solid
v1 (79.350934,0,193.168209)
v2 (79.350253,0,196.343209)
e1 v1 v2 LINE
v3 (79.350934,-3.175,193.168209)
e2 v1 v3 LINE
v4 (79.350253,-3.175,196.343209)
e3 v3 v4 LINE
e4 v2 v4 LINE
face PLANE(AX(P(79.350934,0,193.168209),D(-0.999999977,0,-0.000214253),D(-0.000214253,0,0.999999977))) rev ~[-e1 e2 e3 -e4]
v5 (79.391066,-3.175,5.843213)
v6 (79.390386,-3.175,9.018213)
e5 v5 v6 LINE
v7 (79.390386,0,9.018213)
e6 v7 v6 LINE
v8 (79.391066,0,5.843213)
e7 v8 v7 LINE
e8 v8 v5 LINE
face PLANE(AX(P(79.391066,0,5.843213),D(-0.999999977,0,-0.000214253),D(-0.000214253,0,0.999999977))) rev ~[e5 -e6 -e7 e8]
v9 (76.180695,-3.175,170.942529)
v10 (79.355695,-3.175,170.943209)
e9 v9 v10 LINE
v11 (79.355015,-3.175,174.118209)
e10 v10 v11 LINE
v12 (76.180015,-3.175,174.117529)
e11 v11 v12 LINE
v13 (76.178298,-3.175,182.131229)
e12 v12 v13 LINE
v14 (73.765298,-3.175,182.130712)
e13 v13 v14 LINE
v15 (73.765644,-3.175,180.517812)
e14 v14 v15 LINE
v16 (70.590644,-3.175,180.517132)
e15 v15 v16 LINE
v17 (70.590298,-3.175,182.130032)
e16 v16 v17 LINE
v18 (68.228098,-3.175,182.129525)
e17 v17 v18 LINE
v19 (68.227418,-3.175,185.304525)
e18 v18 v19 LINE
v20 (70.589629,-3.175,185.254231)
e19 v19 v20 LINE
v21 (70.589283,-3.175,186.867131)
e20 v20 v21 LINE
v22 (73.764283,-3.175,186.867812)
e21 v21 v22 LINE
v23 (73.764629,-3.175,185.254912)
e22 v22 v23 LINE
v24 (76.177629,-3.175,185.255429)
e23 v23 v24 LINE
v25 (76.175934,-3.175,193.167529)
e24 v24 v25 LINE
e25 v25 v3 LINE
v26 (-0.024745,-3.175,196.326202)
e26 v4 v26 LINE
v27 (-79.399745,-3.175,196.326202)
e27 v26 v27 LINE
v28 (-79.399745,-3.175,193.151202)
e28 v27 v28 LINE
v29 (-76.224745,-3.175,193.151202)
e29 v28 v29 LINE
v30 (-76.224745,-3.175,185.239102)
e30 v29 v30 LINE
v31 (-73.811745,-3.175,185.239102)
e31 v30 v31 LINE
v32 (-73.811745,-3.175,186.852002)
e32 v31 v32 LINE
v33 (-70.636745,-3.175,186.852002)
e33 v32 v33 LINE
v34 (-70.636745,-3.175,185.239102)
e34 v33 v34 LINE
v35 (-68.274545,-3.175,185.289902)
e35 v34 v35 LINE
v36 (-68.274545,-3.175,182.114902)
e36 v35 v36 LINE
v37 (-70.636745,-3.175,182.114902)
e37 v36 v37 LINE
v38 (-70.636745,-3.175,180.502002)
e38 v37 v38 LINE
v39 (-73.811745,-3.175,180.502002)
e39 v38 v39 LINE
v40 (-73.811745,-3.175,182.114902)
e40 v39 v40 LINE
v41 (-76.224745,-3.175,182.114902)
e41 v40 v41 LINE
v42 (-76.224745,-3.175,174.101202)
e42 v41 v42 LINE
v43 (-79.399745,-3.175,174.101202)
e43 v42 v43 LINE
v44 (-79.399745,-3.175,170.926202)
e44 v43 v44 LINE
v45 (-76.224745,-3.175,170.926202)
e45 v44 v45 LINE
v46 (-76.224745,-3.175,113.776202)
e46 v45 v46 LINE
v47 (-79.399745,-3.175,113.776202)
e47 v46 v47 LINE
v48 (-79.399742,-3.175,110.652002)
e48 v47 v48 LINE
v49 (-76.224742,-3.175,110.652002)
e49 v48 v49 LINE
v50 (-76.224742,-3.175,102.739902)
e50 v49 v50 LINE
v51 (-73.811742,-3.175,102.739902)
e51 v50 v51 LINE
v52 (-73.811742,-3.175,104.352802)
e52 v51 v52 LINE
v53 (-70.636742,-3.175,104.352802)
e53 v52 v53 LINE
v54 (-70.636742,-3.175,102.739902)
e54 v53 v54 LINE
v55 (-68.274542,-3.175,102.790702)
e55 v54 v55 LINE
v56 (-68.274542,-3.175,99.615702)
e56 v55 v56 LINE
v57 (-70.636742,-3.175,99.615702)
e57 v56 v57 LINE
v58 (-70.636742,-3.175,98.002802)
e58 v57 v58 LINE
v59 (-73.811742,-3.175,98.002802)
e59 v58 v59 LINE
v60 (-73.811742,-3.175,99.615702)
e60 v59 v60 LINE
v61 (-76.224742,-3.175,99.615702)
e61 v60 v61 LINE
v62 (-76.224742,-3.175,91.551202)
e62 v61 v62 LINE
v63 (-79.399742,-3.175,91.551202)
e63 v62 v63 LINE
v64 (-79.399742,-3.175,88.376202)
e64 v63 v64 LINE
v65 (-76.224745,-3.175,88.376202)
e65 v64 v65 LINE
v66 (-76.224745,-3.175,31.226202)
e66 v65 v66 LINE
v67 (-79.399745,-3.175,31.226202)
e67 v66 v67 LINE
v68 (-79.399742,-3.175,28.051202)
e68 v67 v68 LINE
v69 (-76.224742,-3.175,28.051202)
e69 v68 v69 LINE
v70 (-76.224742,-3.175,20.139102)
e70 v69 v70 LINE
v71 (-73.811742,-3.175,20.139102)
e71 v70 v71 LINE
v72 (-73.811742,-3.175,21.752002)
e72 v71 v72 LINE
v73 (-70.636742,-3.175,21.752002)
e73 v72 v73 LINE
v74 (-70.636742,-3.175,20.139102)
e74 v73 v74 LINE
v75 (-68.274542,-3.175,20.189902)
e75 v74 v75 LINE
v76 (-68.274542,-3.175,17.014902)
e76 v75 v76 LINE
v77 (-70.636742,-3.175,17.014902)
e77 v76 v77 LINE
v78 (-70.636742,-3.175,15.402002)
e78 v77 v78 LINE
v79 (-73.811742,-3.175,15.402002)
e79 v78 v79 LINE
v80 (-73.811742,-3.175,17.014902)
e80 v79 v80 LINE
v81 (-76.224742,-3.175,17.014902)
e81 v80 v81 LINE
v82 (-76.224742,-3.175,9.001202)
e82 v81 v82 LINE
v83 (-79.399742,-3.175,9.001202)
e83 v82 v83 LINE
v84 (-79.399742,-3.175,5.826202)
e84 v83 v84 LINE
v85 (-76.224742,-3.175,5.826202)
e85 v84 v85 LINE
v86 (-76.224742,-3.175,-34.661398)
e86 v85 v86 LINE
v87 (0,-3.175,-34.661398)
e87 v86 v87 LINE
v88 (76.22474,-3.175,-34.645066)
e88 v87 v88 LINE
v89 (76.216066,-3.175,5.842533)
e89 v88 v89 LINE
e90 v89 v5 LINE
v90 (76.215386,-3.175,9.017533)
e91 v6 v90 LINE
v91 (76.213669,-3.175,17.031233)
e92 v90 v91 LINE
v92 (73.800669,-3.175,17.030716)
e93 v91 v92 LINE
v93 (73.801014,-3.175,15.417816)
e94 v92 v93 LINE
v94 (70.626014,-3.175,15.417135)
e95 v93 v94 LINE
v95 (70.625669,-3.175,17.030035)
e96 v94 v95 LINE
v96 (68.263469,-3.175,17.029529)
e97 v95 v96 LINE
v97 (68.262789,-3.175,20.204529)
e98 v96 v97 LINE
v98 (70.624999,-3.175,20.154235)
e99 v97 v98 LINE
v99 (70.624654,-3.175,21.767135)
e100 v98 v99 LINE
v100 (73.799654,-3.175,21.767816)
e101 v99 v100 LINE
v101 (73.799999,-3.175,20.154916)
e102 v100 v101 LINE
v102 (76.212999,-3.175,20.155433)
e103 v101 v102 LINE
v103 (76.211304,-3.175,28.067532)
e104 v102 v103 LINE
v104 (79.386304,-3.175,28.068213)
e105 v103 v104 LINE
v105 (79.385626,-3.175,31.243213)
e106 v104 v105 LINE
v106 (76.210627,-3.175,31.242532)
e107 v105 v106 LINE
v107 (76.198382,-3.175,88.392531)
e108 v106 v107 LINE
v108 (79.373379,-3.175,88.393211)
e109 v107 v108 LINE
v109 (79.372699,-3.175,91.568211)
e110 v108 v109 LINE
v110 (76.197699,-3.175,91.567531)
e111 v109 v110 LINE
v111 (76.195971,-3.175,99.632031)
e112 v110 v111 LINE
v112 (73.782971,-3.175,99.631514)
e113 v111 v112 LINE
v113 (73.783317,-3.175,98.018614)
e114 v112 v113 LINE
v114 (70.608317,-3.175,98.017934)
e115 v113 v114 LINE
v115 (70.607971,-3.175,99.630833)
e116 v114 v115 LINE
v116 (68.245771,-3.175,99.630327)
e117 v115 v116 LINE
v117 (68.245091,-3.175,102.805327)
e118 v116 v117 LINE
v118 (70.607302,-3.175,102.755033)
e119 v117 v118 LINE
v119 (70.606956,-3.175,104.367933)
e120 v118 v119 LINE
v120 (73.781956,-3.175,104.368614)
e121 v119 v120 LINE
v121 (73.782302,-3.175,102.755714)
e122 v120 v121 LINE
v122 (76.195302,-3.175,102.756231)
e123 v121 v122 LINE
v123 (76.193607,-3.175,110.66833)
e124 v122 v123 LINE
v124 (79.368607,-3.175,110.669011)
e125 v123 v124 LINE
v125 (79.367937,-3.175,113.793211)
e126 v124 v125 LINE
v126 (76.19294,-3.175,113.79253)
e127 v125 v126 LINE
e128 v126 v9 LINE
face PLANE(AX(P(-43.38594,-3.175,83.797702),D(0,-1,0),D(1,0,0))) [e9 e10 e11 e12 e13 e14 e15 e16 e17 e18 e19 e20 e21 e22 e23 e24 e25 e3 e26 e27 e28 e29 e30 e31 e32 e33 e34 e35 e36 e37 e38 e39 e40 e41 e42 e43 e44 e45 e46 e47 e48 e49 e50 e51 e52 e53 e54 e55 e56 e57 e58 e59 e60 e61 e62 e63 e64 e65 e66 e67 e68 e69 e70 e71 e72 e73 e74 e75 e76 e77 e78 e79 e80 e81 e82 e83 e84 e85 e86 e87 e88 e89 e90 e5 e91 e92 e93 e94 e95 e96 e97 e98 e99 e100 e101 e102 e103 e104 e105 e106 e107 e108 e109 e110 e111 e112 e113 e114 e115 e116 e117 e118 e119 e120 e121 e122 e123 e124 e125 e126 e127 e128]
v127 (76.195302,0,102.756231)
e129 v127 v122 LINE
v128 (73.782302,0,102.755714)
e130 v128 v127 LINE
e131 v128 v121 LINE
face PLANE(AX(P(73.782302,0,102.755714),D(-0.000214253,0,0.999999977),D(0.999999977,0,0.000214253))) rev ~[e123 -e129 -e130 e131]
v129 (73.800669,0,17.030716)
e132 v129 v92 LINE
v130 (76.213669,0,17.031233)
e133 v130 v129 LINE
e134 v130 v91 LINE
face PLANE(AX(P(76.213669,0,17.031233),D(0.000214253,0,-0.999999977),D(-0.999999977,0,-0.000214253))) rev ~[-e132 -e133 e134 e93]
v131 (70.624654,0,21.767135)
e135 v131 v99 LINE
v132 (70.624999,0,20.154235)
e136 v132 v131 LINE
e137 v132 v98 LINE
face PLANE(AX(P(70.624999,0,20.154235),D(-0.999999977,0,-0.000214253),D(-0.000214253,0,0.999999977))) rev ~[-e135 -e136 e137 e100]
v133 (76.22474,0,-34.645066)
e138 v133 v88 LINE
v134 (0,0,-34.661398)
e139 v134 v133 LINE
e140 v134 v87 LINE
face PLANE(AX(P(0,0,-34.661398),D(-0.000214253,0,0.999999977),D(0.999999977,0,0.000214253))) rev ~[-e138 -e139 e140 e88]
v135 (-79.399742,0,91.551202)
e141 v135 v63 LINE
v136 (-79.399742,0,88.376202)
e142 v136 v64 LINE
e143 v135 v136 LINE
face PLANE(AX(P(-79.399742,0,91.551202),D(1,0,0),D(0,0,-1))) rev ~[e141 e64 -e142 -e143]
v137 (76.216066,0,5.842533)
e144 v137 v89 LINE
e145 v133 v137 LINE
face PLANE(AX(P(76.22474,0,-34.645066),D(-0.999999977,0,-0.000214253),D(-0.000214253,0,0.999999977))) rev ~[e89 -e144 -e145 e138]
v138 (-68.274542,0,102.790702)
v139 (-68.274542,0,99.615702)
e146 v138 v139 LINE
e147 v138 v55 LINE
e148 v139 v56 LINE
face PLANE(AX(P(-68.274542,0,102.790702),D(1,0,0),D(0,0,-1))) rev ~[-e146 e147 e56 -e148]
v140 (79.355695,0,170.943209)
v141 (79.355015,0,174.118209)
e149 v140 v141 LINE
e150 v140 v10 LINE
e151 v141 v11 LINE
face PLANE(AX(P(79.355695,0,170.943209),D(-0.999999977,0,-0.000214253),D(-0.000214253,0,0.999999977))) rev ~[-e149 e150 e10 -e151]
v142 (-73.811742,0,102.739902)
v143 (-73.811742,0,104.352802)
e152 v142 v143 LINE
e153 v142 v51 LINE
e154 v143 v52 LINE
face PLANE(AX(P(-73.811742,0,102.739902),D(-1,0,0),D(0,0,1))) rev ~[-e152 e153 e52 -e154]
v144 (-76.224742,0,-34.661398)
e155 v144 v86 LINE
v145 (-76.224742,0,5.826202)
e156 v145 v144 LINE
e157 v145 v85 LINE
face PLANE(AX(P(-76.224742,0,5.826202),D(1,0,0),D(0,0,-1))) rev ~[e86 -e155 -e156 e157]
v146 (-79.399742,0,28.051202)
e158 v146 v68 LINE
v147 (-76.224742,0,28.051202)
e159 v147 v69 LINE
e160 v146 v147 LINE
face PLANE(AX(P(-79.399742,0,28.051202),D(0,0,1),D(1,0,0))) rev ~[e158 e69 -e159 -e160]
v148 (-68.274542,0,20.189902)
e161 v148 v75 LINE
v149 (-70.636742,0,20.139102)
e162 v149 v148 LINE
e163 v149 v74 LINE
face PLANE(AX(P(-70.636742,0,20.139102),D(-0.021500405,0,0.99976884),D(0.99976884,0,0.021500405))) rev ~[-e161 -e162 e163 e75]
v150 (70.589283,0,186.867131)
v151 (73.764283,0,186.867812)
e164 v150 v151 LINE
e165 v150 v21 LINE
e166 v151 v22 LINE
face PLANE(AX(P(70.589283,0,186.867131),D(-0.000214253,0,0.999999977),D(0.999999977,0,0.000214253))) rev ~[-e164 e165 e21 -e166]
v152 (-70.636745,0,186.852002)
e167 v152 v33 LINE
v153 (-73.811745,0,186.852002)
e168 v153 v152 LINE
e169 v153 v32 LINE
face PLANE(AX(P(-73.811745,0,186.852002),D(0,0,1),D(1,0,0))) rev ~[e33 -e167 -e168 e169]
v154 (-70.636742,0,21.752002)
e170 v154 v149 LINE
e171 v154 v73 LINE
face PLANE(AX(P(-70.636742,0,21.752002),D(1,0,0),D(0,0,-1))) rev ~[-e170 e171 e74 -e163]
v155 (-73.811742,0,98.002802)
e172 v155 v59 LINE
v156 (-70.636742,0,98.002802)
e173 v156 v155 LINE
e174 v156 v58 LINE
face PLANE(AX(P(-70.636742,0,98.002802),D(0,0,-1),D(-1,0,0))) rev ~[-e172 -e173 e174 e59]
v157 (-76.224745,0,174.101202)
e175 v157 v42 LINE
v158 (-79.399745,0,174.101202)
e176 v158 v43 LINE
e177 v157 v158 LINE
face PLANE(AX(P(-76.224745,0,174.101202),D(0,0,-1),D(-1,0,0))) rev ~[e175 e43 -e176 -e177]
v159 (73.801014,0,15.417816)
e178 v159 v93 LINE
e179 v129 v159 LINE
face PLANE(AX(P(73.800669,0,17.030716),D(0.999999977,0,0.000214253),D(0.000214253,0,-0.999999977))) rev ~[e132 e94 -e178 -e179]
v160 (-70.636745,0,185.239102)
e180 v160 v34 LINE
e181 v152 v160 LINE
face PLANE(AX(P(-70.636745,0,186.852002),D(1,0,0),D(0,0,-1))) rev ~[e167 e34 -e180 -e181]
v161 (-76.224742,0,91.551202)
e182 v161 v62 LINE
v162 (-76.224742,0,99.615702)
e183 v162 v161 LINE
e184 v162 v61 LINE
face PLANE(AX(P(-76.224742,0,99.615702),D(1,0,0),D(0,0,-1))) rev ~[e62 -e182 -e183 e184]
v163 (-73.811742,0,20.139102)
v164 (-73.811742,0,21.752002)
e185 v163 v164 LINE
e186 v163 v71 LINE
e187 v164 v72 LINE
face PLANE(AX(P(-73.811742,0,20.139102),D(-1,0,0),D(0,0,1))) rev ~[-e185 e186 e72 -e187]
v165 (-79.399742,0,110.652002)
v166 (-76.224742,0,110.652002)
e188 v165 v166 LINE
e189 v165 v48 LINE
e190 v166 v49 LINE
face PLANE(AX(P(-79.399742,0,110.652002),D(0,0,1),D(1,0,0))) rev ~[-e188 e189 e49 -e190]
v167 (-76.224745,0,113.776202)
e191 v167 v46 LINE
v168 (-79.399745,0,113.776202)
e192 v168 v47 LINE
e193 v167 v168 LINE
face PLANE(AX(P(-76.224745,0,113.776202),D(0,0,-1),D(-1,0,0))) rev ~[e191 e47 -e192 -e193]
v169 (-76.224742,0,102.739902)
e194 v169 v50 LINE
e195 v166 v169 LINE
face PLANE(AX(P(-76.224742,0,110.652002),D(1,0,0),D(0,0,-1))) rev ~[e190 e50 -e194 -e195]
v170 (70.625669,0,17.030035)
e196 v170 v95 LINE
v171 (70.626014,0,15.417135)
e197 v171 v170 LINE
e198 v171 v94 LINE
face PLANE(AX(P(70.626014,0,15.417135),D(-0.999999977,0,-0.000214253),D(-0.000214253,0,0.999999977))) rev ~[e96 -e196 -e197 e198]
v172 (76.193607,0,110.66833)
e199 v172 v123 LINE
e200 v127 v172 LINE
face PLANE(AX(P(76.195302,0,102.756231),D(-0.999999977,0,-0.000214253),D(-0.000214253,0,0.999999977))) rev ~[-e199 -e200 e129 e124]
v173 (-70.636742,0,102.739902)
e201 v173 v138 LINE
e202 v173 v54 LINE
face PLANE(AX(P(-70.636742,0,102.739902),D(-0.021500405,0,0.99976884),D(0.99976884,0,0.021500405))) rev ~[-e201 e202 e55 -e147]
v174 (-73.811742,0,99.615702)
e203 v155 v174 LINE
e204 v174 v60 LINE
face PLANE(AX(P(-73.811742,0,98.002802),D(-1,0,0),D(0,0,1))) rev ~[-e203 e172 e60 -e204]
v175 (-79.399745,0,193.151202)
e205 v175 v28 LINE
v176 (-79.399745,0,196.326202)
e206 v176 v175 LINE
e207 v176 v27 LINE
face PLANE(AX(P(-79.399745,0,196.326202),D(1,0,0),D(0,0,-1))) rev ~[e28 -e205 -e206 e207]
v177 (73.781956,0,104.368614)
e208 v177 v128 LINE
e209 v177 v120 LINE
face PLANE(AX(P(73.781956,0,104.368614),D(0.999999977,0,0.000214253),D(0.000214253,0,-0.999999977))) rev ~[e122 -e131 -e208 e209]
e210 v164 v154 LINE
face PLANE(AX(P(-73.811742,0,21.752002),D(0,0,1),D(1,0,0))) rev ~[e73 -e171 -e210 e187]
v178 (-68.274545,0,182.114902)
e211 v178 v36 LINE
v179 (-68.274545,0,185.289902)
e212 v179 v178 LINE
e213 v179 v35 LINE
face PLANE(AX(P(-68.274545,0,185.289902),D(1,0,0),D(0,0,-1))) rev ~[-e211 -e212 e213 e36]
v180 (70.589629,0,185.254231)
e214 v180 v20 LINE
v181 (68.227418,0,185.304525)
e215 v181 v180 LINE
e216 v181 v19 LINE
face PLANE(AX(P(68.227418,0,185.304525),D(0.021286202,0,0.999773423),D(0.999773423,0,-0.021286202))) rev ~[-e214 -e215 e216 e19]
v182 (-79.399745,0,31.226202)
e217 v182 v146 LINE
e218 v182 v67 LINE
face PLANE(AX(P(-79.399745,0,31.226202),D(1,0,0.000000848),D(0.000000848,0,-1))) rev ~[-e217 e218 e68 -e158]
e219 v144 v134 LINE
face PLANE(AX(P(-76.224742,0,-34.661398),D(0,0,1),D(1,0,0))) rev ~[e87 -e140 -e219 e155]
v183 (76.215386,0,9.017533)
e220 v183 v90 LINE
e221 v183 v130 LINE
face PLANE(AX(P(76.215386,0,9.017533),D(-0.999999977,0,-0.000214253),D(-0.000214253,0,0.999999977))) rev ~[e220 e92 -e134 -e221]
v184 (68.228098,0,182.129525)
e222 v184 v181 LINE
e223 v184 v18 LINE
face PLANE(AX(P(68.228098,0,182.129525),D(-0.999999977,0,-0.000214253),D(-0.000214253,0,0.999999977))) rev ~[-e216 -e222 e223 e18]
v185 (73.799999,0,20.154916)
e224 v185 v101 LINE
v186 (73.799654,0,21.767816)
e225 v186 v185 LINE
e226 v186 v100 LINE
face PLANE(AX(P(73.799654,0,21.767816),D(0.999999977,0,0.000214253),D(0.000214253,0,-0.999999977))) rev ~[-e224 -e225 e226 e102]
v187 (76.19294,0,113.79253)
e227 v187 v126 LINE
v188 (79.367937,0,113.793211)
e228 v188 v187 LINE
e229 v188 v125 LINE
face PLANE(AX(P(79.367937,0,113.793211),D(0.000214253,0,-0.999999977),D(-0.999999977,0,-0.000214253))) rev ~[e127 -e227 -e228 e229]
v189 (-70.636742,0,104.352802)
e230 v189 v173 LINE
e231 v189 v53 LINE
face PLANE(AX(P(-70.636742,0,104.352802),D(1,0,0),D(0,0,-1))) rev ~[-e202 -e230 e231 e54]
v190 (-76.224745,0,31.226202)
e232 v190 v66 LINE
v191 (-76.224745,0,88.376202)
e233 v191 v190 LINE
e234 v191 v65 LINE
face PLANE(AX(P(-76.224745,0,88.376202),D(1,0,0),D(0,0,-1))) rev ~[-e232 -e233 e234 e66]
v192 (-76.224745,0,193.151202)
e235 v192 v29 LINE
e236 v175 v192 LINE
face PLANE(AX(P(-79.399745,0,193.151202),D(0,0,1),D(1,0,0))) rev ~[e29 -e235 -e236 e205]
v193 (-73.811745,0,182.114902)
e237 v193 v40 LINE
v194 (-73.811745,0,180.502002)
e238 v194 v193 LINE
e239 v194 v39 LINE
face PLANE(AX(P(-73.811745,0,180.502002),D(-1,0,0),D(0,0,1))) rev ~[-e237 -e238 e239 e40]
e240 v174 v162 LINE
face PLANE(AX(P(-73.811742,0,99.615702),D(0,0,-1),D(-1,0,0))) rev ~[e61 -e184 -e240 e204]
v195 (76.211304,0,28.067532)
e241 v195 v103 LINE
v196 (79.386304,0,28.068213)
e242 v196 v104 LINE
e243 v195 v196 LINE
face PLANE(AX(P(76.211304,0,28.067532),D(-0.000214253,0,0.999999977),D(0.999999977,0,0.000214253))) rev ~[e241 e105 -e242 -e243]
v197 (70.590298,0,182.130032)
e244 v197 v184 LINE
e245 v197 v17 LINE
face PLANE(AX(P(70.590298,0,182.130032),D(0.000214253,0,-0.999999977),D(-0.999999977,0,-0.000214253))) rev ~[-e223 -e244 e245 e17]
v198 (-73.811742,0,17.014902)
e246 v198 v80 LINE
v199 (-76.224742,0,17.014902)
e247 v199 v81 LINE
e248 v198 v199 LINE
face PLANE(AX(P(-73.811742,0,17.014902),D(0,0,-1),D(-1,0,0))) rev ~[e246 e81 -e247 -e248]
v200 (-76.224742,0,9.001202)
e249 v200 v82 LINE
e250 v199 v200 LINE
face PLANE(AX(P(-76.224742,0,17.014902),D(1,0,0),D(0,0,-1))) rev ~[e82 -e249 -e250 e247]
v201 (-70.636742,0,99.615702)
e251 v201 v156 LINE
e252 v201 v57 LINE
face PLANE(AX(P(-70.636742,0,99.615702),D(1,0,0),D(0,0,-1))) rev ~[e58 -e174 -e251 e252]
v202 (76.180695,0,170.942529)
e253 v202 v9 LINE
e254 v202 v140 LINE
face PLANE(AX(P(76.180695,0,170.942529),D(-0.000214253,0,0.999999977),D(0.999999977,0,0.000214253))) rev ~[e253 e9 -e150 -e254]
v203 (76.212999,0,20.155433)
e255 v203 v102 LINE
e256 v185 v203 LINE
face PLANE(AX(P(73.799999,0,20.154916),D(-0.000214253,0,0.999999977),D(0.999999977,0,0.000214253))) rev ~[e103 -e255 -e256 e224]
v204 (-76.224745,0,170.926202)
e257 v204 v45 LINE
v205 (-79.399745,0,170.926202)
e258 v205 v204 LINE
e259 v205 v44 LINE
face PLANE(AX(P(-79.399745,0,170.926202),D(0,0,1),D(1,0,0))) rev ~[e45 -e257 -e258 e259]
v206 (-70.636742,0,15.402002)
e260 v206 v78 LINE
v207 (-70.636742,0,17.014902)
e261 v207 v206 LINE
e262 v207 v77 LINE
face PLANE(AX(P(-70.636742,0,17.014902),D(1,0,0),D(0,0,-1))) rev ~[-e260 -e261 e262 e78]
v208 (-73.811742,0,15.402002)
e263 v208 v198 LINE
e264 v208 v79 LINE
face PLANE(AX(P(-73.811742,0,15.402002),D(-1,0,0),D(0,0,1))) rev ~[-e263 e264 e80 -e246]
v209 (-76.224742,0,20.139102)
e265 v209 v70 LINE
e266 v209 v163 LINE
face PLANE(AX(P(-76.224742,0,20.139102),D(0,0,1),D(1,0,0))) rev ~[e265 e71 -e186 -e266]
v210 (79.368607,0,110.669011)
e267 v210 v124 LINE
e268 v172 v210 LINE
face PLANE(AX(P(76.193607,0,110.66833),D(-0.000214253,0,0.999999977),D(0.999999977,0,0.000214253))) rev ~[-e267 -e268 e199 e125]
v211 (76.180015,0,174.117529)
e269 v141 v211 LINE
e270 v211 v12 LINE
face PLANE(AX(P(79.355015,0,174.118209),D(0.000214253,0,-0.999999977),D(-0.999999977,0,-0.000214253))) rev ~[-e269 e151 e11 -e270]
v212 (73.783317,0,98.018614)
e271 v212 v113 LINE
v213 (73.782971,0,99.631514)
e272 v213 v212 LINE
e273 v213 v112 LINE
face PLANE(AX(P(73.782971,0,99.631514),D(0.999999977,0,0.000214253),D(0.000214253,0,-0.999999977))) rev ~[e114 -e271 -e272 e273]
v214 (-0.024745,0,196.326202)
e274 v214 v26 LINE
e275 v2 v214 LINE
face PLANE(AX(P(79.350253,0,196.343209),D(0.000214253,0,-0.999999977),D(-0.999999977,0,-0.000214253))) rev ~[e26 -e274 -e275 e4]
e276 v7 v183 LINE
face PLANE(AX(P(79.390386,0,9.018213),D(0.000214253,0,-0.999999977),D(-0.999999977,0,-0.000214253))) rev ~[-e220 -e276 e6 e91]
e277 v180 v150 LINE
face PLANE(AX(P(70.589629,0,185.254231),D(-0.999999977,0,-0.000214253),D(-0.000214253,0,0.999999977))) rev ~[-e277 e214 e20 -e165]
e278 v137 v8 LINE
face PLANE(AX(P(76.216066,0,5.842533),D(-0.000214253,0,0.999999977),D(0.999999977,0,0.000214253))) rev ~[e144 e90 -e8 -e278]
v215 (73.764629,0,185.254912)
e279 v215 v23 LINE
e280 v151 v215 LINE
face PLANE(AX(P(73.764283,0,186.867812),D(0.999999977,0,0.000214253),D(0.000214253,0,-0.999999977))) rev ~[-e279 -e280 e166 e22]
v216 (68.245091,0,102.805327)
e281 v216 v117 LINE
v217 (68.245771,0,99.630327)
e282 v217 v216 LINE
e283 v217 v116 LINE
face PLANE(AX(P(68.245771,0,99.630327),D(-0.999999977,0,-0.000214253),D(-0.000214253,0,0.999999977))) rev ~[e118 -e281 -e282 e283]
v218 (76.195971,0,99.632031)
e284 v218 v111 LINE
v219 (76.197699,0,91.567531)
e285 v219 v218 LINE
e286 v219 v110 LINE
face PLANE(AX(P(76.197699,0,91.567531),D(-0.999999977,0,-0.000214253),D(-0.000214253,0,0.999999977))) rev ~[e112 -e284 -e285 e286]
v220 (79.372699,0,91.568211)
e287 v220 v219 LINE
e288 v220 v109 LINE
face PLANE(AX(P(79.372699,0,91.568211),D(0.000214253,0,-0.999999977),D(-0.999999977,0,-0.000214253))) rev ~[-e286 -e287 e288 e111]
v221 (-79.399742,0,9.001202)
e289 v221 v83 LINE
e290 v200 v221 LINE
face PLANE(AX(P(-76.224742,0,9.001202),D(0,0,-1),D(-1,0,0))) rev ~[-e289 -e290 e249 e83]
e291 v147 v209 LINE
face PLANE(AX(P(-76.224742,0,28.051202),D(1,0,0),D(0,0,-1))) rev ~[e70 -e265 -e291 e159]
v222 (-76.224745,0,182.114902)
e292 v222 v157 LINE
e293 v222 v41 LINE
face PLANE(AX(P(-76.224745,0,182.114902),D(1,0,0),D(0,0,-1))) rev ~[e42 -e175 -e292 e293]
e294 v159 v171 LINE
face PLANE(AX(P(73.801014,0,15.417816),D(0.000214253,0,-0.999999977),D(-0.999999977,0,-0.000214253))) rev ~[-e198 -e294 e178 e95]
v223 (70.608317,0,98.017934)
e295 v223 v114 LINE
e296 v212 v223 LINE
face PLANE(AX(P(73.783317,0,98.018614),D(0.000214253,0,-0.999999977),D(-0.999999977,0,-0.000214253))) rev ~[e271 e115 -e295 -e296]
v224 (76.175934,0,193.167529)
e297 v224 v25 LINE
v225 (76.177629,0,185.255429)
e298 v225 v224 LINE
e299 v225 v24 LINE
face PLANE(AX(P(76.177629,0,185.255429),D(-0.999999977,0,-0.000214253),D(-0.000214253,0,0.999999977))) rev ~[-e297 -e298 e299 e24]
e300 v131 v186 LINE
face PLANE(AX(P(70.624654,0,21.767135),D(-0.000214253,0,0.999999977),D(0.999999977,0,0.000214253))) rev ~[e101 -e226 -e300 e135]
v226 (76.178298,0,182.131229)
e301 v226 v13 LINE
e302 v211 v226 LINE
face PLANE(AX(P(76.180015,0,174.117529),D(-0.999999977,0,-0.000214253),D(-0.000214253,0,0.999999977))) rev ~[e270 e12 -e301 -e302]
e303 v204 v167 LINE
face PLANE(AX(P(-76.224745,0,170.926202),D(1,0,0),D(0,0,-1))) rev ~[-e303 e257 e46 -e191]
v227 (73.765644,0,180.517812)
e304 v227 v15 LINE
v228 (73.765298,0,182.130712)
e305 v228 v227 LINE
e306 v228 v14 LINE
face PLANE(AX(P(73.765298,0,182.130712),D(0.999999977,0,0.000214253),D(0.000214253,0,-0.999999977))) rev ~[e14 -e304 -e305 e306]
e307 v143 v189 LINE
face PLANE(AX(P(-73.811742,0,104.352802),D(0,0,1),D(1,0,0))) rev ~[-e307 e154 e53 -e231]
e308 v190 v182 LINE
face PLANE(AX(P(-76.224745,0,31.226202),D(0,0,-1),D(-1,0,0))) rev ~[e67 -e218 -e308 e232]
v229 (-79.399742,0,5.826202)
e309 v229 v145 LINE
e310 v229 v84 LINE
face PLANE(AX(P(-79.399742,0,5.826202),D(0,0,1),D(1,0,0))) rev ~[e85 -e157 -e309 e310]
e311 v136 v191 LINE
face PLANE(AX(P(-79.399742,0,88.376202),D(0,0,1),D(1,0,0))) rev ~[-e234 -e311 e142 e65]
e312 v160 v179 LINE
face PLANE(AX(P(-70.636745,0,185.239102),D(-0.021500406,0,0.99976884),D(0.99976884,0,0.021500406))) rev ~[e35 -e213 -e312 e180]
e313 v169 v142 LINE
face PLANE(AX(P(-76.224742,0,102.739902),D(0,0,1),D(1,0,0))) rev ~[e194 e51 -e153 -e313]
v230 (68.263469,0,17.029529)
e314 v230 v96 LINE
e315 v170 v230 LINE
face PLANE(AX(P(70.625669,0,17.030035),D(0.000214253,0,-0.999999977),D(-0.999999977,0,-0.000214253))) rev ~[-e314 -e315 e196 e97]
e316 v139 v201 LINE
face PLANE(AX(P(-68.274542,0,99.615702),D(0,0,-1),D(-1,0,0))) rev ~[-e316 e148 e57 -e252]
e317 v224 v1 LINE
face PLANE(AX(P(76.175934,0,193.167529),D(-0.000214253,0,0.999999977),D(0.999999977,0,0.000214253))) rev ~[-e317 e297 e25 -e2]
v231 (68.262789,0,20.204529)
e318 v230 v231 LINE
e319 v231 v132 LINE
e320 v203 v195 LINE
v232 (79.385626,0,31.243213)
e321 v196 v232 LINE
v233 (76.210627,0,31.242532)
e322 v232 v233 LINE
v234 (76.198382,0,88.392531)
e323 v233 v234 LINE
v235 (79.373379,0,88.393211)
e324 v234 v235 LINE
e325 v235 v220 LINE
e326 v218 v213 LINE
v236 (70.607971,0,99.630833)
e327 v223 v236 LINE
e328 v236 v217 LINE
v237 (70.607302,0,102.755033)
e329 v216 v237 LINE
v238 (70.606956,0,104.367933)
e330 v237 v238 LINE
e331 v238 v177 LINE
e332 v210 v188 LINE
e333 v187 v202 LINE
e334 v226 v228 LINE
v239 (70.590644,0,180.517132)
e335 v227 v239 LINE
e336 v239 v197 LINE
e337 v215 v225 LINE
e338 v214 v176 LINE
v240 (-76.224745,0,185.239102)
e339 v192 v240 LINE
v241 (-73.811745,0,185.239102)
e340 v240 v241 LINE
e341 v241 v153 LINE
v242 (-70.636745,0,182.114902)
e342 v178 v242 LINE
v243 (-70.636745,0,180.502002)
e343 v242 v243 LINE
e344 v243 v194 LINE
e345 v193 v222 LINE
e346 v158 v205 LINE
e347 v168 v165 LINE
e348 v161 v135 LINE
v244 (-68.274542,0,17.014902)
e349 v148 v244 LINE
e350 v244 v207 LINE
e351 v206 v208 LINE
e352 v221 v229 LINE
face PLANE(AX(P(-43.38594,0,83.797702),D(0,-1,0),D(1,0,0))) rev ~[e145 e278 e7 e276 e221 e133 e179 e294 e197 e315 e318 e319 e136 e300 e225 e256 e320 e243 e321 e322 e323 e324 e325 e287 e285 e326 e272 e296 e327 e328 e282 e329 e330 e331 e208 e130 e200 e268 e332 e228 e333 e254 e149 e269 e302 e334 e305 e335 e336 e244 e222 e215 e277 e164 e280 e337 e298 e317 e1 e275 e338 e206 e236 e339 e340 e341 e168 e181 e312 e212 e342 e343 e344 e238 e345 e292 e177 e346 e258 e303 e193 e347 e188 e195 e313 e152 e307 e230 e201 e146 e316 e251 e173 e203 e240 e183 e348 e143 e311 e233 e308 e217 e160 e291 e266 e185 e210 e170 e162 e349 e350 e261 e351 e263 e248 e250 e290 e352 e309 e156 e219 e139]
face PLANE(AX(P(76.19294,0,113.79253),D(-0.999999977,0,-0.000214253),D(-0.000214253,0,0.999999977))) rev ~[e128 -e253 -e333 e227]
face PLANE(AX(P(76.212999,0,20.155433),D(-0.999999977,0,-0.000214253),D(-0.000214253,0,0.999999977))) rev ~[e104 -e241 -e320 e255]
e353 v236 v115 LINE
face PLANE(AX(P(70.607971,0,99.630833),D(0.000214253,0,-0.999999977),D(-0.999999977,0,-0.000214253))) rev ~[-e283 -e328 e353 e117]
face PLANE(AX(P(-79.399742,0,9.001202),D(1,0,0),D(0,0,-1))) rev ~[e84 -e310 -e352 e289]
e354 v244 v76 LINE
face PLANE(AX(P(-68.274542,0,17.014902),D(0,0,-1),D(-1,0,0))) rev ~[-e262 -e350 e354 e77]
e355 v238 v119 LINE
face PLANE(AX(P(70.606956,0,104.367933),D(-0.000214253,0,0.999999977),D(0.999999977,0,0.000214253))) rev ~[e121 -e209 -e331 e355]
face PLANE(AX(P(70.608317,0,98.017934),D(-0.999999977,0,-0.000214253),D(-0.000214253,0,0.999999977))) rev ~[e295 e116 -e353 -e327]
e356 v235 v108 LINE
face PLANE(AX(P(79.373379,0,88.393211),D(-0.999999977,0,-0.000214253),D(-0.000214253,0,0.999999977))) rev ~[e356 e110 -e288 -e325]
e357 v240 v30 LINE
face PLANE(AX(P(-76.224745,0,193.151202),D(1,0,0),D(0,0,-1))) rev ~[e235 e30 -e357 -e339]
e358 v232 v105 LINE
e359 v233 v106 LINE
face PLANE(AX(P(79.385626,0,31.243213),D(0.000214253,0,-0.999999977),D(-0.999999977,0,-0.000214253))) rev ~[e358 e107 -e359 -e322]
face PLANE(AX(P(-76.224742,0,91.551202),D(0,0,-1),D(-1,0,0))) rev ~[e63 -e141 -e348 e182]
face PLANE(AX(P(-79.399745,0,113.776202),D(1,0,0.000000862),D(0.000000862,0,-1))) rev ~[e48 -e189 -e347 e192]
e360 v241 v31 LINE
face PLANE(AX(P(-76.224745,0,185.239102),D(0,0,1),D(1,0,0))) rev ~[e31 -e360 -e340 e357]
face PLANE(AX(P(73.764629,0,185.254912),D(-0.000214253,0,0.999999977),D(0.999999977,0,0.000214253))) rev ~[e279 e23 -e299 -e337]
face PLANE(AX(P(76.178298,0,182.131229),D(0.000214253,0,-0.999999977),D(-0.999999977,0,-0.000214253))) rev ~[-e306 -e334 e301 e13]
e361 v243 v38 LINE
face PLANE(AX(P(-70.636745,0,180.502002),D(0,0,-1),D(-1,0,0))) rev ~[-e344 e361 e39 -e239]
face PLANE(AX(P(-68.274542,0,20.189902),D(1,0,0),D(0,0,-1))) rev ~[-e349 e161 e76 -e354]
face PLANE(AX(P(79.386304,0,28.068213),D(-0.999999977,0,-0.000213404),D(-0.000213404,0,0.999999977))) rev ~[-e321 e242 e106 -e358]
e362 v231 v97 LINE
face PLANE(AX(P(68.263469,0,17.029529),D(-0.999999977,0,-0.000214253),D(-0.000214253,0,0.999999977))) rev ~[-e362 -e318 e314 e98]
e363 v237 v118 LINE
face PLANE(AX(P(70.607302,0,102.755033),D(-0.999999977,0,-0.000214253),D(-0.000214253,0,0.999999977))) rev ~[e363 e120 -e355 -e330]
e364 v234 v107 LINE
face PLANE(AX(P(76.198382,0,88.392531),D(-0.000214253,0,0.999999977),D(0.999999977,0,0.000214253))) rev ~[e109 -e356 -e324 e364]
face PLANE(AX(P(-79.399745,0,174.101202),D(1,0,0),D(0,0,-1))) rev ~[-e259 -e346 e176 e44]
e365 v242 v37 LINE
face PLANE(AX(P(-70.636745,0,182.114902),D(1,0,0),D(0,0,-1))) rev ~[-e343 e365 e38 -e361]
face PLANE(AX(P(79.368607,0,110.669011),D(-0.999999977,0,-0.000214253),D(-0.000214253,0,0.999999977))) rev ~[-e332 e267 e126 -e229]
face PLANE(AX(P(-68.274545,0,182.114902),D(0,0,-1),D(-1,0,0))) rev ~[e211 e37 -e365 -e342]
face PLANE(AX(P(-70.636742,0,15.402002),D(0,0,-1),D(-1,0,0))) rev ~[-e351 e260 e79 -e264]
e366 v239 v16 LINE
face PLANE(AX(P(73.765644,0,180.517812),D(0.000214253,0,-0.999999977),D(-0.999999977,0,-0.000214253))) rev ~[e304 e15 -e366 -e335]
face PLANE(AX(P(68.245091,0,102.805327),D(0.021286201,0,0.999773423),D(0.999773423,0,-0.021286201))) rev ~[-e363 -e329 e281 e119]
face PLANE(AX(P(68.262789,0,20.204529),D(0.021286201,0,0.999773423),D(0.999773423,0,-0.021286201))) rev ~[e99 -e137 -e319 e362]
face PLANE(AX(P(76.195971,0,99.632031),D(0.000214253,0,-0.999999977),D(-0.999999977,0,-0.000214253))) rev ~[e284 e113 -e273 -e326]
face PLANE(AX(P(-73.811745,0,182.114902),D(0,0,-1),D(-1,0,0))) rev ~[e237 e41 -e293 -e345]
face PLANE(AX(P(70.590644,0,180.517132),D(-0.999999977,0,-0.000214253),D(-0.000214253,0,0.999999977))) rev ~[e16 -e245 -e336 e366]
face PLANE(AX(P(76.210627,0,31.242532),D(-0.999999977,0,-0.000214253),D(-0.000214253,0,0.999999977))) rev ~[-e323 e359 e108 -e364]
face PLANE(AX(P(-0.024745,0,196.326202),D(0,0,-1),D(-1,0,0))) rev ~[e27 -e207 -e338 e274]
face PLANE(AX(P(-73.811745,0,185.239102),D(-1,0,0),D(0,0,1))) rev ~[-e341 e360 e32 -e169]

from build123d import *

# Parameters (mm, degrees)
F1_DEPTH = 3.175


# Not quite as in the source:
# - ends of sketch curves that miss each other by under 0.0002 mm in the source are joined


with BuildPart() as f1:
    # F0 (on Front) → F1 (new body)
    with BuildSketch(Plane.XZ):
        Polygon((-0.0247448797, 196.3262024198), (-79.3997448797, 196.3262024198), (-79.3997448797, 193.1512024198), (-76.2247448797, 193.1512024198), (-76.2247448797, 185.2391024198), (-73.8117448797, 185.2391024198), (-73.8117448797, 186.8520024198), (-70.6367448797, 186.8520024198), (-70.6367448797, 185.2391024198), (-68.2745449228, 185.2899024198), (-68.2745449228, 182.1149024198), (-70.6367449228, 182.1149024198), (-70.6367449228, 180.5020024198), (-73.8117449228, 180.5020024198), (-73.8117449228, 182.1149024198), (-76.2247448797, 182.1149024198), (-76.2247448797, 174.1012024198), (-79.3997448797, 174.1012024198), (-79.3997448797, 170.9262024198), (-76.2247448797, 170.9262024198), (-76.2247448797, 113.7762024198), (-79.3997448797, 113.7762024198), (-79.3997421861, 110.6520024198), (-76.2247421861, 110.6520024198), (-76.2247421861, 102.7399024198), (-73.8117421861, 102.7399024198), (-73.8117421861, 104.3528024198), (-70.6367421861, 104.3528024198), (-70.6367421861, 102.7399024198), (-68.2745421861, 102.7907024198), (-68.2745421861, 99.6157024198), (-70.6367421861, 99.6157024198), (-70.6367421861, 98.0028024198), (-73.8117421861, 98.0028024198), (-73.8117421861, 99.6157024198), (-76.2247421861, 99.6157024198), (-76.2247421861, 91.5512024198), (-79.3997421861, 91.5512024198), (-79.3997421861, 88.3762024198), (-76.2247449228, 88.3762024198), (-76.2247449228, 31.2262024198), (-79.3997448797, 31.2262024198), (-79.3997421861, 28.0512024198), (-76.2247421861, 28.0512024198), (-76.2247421861, 20.1391024198), (-73.8117421861, 20.1391024198), (-73.8117421861, 21.7520024198), (-70.6367421861, 21.7520024198), (-70.6367421861, 20.1391024198), (-68.2745421861, 20.1899024198), (-68.2745421861, 17.0149024198), (-70.6367421861, 17.0149024198), (-70.6367421861, 15.4020024198), (-73.8117421861, 15.4020024198), (-73.8117421861, 17.0149024198), (-76.2247421861, 17.0149024198), (-76.2247421861, 9.0012024198), (-79.3997421861, 9.0012024198), (-79.3997421861, 5.8262024198), (-76.2247421861, 5.8262024198), (-76.2247421861, -34.6613975802), (0, -34.6613975802), align=None)
        Polygon((79.3502532985, 196.3432087423), (-0.0247448797, 196.3262024198), (0, -34.6613975802), (76.2247404365, -34.6450662095), (76.2160658516, 5.8425328612), (79.3910657787, 5.8432131141), (79.3903855258, 9.0182130412), (76.2153855987, 9.0175327883), (76.2136686404, 17.0312326044), (73.8006686958, 17.0307156122), (73.8010142642, 15.4178156492), (70.6260143371, 15.4171353963), (70.6256687686, 17.0300353593), (68.2634688228, 17.0295292511), (68.2627885699, 20.2045291783), (70.6249993998, 20.1542352876), (70.6246538313, 21.7671352506), (73.7996537584, 21.7678155035), (73.7999993269, 20.1549155405), (76.2129992715, 20.1554325327), (76.2113040813, 28.0675323511), (79.3863040084, 28.068212604), (79.3856264492, 31.2432125317), (76.2106265651, 31.2425322788), (76.198382013, 88.3925309671), (79.3733792034, 88.3932112194), (79.3726989505, 91.5682111465), (76.1976990233, 91.5675308936), (76.195971181, 99.6320307085), (73.7829712364, 99.6315137163), (73.7833168048, 98.0186137533), (70.6083168777, 98.0179335004), (70.6079713092, 99.6308334634), (68.2457713634, 99.6303273553), (68.2450911105, 102.8053272824), (70.6073019404, 102.7550333917), (70.6069563719, 104.3679333547), (73.781956299, 104.3686136076), (73.7823018675, 102.7557136446), (76.1953018121, 102.7562306368), (76.1936066219, 110.6683304552), (79.368606549, 110.6690107081), (79.3679371802, 113.7932106364), (76.1929399467, 113.7925303841), (76.1806953945, 170.9425290724), (79.3556953216, 170.9432093253), (79.3550150687, 174.1182092524), (76.1800151416, 174.1175289995), (76.1782981833, 182.1312288156), (73.7652982818, 182.1307118234), (73.7656438503, 180.5178118604), (70.5906439231, 180.5171316075), (70.5902983547, 182.1300315705), (68.2280984089, 182.1295254623), (68.227418156, 185.3045253894), (70.5896289427, 185.2542314987), (70.5892833742, 186.8671314617), (73.7642833014, 186.8678117146), (73.7646288698, 185.2549117516), (76.1776288145, 185.2554287439), (76.1759336242, 193.1675285623), (79.3509335514, 193.1682088151), align=None)
    extrude(amount=F1_DEPTH)


solid = f1.part
